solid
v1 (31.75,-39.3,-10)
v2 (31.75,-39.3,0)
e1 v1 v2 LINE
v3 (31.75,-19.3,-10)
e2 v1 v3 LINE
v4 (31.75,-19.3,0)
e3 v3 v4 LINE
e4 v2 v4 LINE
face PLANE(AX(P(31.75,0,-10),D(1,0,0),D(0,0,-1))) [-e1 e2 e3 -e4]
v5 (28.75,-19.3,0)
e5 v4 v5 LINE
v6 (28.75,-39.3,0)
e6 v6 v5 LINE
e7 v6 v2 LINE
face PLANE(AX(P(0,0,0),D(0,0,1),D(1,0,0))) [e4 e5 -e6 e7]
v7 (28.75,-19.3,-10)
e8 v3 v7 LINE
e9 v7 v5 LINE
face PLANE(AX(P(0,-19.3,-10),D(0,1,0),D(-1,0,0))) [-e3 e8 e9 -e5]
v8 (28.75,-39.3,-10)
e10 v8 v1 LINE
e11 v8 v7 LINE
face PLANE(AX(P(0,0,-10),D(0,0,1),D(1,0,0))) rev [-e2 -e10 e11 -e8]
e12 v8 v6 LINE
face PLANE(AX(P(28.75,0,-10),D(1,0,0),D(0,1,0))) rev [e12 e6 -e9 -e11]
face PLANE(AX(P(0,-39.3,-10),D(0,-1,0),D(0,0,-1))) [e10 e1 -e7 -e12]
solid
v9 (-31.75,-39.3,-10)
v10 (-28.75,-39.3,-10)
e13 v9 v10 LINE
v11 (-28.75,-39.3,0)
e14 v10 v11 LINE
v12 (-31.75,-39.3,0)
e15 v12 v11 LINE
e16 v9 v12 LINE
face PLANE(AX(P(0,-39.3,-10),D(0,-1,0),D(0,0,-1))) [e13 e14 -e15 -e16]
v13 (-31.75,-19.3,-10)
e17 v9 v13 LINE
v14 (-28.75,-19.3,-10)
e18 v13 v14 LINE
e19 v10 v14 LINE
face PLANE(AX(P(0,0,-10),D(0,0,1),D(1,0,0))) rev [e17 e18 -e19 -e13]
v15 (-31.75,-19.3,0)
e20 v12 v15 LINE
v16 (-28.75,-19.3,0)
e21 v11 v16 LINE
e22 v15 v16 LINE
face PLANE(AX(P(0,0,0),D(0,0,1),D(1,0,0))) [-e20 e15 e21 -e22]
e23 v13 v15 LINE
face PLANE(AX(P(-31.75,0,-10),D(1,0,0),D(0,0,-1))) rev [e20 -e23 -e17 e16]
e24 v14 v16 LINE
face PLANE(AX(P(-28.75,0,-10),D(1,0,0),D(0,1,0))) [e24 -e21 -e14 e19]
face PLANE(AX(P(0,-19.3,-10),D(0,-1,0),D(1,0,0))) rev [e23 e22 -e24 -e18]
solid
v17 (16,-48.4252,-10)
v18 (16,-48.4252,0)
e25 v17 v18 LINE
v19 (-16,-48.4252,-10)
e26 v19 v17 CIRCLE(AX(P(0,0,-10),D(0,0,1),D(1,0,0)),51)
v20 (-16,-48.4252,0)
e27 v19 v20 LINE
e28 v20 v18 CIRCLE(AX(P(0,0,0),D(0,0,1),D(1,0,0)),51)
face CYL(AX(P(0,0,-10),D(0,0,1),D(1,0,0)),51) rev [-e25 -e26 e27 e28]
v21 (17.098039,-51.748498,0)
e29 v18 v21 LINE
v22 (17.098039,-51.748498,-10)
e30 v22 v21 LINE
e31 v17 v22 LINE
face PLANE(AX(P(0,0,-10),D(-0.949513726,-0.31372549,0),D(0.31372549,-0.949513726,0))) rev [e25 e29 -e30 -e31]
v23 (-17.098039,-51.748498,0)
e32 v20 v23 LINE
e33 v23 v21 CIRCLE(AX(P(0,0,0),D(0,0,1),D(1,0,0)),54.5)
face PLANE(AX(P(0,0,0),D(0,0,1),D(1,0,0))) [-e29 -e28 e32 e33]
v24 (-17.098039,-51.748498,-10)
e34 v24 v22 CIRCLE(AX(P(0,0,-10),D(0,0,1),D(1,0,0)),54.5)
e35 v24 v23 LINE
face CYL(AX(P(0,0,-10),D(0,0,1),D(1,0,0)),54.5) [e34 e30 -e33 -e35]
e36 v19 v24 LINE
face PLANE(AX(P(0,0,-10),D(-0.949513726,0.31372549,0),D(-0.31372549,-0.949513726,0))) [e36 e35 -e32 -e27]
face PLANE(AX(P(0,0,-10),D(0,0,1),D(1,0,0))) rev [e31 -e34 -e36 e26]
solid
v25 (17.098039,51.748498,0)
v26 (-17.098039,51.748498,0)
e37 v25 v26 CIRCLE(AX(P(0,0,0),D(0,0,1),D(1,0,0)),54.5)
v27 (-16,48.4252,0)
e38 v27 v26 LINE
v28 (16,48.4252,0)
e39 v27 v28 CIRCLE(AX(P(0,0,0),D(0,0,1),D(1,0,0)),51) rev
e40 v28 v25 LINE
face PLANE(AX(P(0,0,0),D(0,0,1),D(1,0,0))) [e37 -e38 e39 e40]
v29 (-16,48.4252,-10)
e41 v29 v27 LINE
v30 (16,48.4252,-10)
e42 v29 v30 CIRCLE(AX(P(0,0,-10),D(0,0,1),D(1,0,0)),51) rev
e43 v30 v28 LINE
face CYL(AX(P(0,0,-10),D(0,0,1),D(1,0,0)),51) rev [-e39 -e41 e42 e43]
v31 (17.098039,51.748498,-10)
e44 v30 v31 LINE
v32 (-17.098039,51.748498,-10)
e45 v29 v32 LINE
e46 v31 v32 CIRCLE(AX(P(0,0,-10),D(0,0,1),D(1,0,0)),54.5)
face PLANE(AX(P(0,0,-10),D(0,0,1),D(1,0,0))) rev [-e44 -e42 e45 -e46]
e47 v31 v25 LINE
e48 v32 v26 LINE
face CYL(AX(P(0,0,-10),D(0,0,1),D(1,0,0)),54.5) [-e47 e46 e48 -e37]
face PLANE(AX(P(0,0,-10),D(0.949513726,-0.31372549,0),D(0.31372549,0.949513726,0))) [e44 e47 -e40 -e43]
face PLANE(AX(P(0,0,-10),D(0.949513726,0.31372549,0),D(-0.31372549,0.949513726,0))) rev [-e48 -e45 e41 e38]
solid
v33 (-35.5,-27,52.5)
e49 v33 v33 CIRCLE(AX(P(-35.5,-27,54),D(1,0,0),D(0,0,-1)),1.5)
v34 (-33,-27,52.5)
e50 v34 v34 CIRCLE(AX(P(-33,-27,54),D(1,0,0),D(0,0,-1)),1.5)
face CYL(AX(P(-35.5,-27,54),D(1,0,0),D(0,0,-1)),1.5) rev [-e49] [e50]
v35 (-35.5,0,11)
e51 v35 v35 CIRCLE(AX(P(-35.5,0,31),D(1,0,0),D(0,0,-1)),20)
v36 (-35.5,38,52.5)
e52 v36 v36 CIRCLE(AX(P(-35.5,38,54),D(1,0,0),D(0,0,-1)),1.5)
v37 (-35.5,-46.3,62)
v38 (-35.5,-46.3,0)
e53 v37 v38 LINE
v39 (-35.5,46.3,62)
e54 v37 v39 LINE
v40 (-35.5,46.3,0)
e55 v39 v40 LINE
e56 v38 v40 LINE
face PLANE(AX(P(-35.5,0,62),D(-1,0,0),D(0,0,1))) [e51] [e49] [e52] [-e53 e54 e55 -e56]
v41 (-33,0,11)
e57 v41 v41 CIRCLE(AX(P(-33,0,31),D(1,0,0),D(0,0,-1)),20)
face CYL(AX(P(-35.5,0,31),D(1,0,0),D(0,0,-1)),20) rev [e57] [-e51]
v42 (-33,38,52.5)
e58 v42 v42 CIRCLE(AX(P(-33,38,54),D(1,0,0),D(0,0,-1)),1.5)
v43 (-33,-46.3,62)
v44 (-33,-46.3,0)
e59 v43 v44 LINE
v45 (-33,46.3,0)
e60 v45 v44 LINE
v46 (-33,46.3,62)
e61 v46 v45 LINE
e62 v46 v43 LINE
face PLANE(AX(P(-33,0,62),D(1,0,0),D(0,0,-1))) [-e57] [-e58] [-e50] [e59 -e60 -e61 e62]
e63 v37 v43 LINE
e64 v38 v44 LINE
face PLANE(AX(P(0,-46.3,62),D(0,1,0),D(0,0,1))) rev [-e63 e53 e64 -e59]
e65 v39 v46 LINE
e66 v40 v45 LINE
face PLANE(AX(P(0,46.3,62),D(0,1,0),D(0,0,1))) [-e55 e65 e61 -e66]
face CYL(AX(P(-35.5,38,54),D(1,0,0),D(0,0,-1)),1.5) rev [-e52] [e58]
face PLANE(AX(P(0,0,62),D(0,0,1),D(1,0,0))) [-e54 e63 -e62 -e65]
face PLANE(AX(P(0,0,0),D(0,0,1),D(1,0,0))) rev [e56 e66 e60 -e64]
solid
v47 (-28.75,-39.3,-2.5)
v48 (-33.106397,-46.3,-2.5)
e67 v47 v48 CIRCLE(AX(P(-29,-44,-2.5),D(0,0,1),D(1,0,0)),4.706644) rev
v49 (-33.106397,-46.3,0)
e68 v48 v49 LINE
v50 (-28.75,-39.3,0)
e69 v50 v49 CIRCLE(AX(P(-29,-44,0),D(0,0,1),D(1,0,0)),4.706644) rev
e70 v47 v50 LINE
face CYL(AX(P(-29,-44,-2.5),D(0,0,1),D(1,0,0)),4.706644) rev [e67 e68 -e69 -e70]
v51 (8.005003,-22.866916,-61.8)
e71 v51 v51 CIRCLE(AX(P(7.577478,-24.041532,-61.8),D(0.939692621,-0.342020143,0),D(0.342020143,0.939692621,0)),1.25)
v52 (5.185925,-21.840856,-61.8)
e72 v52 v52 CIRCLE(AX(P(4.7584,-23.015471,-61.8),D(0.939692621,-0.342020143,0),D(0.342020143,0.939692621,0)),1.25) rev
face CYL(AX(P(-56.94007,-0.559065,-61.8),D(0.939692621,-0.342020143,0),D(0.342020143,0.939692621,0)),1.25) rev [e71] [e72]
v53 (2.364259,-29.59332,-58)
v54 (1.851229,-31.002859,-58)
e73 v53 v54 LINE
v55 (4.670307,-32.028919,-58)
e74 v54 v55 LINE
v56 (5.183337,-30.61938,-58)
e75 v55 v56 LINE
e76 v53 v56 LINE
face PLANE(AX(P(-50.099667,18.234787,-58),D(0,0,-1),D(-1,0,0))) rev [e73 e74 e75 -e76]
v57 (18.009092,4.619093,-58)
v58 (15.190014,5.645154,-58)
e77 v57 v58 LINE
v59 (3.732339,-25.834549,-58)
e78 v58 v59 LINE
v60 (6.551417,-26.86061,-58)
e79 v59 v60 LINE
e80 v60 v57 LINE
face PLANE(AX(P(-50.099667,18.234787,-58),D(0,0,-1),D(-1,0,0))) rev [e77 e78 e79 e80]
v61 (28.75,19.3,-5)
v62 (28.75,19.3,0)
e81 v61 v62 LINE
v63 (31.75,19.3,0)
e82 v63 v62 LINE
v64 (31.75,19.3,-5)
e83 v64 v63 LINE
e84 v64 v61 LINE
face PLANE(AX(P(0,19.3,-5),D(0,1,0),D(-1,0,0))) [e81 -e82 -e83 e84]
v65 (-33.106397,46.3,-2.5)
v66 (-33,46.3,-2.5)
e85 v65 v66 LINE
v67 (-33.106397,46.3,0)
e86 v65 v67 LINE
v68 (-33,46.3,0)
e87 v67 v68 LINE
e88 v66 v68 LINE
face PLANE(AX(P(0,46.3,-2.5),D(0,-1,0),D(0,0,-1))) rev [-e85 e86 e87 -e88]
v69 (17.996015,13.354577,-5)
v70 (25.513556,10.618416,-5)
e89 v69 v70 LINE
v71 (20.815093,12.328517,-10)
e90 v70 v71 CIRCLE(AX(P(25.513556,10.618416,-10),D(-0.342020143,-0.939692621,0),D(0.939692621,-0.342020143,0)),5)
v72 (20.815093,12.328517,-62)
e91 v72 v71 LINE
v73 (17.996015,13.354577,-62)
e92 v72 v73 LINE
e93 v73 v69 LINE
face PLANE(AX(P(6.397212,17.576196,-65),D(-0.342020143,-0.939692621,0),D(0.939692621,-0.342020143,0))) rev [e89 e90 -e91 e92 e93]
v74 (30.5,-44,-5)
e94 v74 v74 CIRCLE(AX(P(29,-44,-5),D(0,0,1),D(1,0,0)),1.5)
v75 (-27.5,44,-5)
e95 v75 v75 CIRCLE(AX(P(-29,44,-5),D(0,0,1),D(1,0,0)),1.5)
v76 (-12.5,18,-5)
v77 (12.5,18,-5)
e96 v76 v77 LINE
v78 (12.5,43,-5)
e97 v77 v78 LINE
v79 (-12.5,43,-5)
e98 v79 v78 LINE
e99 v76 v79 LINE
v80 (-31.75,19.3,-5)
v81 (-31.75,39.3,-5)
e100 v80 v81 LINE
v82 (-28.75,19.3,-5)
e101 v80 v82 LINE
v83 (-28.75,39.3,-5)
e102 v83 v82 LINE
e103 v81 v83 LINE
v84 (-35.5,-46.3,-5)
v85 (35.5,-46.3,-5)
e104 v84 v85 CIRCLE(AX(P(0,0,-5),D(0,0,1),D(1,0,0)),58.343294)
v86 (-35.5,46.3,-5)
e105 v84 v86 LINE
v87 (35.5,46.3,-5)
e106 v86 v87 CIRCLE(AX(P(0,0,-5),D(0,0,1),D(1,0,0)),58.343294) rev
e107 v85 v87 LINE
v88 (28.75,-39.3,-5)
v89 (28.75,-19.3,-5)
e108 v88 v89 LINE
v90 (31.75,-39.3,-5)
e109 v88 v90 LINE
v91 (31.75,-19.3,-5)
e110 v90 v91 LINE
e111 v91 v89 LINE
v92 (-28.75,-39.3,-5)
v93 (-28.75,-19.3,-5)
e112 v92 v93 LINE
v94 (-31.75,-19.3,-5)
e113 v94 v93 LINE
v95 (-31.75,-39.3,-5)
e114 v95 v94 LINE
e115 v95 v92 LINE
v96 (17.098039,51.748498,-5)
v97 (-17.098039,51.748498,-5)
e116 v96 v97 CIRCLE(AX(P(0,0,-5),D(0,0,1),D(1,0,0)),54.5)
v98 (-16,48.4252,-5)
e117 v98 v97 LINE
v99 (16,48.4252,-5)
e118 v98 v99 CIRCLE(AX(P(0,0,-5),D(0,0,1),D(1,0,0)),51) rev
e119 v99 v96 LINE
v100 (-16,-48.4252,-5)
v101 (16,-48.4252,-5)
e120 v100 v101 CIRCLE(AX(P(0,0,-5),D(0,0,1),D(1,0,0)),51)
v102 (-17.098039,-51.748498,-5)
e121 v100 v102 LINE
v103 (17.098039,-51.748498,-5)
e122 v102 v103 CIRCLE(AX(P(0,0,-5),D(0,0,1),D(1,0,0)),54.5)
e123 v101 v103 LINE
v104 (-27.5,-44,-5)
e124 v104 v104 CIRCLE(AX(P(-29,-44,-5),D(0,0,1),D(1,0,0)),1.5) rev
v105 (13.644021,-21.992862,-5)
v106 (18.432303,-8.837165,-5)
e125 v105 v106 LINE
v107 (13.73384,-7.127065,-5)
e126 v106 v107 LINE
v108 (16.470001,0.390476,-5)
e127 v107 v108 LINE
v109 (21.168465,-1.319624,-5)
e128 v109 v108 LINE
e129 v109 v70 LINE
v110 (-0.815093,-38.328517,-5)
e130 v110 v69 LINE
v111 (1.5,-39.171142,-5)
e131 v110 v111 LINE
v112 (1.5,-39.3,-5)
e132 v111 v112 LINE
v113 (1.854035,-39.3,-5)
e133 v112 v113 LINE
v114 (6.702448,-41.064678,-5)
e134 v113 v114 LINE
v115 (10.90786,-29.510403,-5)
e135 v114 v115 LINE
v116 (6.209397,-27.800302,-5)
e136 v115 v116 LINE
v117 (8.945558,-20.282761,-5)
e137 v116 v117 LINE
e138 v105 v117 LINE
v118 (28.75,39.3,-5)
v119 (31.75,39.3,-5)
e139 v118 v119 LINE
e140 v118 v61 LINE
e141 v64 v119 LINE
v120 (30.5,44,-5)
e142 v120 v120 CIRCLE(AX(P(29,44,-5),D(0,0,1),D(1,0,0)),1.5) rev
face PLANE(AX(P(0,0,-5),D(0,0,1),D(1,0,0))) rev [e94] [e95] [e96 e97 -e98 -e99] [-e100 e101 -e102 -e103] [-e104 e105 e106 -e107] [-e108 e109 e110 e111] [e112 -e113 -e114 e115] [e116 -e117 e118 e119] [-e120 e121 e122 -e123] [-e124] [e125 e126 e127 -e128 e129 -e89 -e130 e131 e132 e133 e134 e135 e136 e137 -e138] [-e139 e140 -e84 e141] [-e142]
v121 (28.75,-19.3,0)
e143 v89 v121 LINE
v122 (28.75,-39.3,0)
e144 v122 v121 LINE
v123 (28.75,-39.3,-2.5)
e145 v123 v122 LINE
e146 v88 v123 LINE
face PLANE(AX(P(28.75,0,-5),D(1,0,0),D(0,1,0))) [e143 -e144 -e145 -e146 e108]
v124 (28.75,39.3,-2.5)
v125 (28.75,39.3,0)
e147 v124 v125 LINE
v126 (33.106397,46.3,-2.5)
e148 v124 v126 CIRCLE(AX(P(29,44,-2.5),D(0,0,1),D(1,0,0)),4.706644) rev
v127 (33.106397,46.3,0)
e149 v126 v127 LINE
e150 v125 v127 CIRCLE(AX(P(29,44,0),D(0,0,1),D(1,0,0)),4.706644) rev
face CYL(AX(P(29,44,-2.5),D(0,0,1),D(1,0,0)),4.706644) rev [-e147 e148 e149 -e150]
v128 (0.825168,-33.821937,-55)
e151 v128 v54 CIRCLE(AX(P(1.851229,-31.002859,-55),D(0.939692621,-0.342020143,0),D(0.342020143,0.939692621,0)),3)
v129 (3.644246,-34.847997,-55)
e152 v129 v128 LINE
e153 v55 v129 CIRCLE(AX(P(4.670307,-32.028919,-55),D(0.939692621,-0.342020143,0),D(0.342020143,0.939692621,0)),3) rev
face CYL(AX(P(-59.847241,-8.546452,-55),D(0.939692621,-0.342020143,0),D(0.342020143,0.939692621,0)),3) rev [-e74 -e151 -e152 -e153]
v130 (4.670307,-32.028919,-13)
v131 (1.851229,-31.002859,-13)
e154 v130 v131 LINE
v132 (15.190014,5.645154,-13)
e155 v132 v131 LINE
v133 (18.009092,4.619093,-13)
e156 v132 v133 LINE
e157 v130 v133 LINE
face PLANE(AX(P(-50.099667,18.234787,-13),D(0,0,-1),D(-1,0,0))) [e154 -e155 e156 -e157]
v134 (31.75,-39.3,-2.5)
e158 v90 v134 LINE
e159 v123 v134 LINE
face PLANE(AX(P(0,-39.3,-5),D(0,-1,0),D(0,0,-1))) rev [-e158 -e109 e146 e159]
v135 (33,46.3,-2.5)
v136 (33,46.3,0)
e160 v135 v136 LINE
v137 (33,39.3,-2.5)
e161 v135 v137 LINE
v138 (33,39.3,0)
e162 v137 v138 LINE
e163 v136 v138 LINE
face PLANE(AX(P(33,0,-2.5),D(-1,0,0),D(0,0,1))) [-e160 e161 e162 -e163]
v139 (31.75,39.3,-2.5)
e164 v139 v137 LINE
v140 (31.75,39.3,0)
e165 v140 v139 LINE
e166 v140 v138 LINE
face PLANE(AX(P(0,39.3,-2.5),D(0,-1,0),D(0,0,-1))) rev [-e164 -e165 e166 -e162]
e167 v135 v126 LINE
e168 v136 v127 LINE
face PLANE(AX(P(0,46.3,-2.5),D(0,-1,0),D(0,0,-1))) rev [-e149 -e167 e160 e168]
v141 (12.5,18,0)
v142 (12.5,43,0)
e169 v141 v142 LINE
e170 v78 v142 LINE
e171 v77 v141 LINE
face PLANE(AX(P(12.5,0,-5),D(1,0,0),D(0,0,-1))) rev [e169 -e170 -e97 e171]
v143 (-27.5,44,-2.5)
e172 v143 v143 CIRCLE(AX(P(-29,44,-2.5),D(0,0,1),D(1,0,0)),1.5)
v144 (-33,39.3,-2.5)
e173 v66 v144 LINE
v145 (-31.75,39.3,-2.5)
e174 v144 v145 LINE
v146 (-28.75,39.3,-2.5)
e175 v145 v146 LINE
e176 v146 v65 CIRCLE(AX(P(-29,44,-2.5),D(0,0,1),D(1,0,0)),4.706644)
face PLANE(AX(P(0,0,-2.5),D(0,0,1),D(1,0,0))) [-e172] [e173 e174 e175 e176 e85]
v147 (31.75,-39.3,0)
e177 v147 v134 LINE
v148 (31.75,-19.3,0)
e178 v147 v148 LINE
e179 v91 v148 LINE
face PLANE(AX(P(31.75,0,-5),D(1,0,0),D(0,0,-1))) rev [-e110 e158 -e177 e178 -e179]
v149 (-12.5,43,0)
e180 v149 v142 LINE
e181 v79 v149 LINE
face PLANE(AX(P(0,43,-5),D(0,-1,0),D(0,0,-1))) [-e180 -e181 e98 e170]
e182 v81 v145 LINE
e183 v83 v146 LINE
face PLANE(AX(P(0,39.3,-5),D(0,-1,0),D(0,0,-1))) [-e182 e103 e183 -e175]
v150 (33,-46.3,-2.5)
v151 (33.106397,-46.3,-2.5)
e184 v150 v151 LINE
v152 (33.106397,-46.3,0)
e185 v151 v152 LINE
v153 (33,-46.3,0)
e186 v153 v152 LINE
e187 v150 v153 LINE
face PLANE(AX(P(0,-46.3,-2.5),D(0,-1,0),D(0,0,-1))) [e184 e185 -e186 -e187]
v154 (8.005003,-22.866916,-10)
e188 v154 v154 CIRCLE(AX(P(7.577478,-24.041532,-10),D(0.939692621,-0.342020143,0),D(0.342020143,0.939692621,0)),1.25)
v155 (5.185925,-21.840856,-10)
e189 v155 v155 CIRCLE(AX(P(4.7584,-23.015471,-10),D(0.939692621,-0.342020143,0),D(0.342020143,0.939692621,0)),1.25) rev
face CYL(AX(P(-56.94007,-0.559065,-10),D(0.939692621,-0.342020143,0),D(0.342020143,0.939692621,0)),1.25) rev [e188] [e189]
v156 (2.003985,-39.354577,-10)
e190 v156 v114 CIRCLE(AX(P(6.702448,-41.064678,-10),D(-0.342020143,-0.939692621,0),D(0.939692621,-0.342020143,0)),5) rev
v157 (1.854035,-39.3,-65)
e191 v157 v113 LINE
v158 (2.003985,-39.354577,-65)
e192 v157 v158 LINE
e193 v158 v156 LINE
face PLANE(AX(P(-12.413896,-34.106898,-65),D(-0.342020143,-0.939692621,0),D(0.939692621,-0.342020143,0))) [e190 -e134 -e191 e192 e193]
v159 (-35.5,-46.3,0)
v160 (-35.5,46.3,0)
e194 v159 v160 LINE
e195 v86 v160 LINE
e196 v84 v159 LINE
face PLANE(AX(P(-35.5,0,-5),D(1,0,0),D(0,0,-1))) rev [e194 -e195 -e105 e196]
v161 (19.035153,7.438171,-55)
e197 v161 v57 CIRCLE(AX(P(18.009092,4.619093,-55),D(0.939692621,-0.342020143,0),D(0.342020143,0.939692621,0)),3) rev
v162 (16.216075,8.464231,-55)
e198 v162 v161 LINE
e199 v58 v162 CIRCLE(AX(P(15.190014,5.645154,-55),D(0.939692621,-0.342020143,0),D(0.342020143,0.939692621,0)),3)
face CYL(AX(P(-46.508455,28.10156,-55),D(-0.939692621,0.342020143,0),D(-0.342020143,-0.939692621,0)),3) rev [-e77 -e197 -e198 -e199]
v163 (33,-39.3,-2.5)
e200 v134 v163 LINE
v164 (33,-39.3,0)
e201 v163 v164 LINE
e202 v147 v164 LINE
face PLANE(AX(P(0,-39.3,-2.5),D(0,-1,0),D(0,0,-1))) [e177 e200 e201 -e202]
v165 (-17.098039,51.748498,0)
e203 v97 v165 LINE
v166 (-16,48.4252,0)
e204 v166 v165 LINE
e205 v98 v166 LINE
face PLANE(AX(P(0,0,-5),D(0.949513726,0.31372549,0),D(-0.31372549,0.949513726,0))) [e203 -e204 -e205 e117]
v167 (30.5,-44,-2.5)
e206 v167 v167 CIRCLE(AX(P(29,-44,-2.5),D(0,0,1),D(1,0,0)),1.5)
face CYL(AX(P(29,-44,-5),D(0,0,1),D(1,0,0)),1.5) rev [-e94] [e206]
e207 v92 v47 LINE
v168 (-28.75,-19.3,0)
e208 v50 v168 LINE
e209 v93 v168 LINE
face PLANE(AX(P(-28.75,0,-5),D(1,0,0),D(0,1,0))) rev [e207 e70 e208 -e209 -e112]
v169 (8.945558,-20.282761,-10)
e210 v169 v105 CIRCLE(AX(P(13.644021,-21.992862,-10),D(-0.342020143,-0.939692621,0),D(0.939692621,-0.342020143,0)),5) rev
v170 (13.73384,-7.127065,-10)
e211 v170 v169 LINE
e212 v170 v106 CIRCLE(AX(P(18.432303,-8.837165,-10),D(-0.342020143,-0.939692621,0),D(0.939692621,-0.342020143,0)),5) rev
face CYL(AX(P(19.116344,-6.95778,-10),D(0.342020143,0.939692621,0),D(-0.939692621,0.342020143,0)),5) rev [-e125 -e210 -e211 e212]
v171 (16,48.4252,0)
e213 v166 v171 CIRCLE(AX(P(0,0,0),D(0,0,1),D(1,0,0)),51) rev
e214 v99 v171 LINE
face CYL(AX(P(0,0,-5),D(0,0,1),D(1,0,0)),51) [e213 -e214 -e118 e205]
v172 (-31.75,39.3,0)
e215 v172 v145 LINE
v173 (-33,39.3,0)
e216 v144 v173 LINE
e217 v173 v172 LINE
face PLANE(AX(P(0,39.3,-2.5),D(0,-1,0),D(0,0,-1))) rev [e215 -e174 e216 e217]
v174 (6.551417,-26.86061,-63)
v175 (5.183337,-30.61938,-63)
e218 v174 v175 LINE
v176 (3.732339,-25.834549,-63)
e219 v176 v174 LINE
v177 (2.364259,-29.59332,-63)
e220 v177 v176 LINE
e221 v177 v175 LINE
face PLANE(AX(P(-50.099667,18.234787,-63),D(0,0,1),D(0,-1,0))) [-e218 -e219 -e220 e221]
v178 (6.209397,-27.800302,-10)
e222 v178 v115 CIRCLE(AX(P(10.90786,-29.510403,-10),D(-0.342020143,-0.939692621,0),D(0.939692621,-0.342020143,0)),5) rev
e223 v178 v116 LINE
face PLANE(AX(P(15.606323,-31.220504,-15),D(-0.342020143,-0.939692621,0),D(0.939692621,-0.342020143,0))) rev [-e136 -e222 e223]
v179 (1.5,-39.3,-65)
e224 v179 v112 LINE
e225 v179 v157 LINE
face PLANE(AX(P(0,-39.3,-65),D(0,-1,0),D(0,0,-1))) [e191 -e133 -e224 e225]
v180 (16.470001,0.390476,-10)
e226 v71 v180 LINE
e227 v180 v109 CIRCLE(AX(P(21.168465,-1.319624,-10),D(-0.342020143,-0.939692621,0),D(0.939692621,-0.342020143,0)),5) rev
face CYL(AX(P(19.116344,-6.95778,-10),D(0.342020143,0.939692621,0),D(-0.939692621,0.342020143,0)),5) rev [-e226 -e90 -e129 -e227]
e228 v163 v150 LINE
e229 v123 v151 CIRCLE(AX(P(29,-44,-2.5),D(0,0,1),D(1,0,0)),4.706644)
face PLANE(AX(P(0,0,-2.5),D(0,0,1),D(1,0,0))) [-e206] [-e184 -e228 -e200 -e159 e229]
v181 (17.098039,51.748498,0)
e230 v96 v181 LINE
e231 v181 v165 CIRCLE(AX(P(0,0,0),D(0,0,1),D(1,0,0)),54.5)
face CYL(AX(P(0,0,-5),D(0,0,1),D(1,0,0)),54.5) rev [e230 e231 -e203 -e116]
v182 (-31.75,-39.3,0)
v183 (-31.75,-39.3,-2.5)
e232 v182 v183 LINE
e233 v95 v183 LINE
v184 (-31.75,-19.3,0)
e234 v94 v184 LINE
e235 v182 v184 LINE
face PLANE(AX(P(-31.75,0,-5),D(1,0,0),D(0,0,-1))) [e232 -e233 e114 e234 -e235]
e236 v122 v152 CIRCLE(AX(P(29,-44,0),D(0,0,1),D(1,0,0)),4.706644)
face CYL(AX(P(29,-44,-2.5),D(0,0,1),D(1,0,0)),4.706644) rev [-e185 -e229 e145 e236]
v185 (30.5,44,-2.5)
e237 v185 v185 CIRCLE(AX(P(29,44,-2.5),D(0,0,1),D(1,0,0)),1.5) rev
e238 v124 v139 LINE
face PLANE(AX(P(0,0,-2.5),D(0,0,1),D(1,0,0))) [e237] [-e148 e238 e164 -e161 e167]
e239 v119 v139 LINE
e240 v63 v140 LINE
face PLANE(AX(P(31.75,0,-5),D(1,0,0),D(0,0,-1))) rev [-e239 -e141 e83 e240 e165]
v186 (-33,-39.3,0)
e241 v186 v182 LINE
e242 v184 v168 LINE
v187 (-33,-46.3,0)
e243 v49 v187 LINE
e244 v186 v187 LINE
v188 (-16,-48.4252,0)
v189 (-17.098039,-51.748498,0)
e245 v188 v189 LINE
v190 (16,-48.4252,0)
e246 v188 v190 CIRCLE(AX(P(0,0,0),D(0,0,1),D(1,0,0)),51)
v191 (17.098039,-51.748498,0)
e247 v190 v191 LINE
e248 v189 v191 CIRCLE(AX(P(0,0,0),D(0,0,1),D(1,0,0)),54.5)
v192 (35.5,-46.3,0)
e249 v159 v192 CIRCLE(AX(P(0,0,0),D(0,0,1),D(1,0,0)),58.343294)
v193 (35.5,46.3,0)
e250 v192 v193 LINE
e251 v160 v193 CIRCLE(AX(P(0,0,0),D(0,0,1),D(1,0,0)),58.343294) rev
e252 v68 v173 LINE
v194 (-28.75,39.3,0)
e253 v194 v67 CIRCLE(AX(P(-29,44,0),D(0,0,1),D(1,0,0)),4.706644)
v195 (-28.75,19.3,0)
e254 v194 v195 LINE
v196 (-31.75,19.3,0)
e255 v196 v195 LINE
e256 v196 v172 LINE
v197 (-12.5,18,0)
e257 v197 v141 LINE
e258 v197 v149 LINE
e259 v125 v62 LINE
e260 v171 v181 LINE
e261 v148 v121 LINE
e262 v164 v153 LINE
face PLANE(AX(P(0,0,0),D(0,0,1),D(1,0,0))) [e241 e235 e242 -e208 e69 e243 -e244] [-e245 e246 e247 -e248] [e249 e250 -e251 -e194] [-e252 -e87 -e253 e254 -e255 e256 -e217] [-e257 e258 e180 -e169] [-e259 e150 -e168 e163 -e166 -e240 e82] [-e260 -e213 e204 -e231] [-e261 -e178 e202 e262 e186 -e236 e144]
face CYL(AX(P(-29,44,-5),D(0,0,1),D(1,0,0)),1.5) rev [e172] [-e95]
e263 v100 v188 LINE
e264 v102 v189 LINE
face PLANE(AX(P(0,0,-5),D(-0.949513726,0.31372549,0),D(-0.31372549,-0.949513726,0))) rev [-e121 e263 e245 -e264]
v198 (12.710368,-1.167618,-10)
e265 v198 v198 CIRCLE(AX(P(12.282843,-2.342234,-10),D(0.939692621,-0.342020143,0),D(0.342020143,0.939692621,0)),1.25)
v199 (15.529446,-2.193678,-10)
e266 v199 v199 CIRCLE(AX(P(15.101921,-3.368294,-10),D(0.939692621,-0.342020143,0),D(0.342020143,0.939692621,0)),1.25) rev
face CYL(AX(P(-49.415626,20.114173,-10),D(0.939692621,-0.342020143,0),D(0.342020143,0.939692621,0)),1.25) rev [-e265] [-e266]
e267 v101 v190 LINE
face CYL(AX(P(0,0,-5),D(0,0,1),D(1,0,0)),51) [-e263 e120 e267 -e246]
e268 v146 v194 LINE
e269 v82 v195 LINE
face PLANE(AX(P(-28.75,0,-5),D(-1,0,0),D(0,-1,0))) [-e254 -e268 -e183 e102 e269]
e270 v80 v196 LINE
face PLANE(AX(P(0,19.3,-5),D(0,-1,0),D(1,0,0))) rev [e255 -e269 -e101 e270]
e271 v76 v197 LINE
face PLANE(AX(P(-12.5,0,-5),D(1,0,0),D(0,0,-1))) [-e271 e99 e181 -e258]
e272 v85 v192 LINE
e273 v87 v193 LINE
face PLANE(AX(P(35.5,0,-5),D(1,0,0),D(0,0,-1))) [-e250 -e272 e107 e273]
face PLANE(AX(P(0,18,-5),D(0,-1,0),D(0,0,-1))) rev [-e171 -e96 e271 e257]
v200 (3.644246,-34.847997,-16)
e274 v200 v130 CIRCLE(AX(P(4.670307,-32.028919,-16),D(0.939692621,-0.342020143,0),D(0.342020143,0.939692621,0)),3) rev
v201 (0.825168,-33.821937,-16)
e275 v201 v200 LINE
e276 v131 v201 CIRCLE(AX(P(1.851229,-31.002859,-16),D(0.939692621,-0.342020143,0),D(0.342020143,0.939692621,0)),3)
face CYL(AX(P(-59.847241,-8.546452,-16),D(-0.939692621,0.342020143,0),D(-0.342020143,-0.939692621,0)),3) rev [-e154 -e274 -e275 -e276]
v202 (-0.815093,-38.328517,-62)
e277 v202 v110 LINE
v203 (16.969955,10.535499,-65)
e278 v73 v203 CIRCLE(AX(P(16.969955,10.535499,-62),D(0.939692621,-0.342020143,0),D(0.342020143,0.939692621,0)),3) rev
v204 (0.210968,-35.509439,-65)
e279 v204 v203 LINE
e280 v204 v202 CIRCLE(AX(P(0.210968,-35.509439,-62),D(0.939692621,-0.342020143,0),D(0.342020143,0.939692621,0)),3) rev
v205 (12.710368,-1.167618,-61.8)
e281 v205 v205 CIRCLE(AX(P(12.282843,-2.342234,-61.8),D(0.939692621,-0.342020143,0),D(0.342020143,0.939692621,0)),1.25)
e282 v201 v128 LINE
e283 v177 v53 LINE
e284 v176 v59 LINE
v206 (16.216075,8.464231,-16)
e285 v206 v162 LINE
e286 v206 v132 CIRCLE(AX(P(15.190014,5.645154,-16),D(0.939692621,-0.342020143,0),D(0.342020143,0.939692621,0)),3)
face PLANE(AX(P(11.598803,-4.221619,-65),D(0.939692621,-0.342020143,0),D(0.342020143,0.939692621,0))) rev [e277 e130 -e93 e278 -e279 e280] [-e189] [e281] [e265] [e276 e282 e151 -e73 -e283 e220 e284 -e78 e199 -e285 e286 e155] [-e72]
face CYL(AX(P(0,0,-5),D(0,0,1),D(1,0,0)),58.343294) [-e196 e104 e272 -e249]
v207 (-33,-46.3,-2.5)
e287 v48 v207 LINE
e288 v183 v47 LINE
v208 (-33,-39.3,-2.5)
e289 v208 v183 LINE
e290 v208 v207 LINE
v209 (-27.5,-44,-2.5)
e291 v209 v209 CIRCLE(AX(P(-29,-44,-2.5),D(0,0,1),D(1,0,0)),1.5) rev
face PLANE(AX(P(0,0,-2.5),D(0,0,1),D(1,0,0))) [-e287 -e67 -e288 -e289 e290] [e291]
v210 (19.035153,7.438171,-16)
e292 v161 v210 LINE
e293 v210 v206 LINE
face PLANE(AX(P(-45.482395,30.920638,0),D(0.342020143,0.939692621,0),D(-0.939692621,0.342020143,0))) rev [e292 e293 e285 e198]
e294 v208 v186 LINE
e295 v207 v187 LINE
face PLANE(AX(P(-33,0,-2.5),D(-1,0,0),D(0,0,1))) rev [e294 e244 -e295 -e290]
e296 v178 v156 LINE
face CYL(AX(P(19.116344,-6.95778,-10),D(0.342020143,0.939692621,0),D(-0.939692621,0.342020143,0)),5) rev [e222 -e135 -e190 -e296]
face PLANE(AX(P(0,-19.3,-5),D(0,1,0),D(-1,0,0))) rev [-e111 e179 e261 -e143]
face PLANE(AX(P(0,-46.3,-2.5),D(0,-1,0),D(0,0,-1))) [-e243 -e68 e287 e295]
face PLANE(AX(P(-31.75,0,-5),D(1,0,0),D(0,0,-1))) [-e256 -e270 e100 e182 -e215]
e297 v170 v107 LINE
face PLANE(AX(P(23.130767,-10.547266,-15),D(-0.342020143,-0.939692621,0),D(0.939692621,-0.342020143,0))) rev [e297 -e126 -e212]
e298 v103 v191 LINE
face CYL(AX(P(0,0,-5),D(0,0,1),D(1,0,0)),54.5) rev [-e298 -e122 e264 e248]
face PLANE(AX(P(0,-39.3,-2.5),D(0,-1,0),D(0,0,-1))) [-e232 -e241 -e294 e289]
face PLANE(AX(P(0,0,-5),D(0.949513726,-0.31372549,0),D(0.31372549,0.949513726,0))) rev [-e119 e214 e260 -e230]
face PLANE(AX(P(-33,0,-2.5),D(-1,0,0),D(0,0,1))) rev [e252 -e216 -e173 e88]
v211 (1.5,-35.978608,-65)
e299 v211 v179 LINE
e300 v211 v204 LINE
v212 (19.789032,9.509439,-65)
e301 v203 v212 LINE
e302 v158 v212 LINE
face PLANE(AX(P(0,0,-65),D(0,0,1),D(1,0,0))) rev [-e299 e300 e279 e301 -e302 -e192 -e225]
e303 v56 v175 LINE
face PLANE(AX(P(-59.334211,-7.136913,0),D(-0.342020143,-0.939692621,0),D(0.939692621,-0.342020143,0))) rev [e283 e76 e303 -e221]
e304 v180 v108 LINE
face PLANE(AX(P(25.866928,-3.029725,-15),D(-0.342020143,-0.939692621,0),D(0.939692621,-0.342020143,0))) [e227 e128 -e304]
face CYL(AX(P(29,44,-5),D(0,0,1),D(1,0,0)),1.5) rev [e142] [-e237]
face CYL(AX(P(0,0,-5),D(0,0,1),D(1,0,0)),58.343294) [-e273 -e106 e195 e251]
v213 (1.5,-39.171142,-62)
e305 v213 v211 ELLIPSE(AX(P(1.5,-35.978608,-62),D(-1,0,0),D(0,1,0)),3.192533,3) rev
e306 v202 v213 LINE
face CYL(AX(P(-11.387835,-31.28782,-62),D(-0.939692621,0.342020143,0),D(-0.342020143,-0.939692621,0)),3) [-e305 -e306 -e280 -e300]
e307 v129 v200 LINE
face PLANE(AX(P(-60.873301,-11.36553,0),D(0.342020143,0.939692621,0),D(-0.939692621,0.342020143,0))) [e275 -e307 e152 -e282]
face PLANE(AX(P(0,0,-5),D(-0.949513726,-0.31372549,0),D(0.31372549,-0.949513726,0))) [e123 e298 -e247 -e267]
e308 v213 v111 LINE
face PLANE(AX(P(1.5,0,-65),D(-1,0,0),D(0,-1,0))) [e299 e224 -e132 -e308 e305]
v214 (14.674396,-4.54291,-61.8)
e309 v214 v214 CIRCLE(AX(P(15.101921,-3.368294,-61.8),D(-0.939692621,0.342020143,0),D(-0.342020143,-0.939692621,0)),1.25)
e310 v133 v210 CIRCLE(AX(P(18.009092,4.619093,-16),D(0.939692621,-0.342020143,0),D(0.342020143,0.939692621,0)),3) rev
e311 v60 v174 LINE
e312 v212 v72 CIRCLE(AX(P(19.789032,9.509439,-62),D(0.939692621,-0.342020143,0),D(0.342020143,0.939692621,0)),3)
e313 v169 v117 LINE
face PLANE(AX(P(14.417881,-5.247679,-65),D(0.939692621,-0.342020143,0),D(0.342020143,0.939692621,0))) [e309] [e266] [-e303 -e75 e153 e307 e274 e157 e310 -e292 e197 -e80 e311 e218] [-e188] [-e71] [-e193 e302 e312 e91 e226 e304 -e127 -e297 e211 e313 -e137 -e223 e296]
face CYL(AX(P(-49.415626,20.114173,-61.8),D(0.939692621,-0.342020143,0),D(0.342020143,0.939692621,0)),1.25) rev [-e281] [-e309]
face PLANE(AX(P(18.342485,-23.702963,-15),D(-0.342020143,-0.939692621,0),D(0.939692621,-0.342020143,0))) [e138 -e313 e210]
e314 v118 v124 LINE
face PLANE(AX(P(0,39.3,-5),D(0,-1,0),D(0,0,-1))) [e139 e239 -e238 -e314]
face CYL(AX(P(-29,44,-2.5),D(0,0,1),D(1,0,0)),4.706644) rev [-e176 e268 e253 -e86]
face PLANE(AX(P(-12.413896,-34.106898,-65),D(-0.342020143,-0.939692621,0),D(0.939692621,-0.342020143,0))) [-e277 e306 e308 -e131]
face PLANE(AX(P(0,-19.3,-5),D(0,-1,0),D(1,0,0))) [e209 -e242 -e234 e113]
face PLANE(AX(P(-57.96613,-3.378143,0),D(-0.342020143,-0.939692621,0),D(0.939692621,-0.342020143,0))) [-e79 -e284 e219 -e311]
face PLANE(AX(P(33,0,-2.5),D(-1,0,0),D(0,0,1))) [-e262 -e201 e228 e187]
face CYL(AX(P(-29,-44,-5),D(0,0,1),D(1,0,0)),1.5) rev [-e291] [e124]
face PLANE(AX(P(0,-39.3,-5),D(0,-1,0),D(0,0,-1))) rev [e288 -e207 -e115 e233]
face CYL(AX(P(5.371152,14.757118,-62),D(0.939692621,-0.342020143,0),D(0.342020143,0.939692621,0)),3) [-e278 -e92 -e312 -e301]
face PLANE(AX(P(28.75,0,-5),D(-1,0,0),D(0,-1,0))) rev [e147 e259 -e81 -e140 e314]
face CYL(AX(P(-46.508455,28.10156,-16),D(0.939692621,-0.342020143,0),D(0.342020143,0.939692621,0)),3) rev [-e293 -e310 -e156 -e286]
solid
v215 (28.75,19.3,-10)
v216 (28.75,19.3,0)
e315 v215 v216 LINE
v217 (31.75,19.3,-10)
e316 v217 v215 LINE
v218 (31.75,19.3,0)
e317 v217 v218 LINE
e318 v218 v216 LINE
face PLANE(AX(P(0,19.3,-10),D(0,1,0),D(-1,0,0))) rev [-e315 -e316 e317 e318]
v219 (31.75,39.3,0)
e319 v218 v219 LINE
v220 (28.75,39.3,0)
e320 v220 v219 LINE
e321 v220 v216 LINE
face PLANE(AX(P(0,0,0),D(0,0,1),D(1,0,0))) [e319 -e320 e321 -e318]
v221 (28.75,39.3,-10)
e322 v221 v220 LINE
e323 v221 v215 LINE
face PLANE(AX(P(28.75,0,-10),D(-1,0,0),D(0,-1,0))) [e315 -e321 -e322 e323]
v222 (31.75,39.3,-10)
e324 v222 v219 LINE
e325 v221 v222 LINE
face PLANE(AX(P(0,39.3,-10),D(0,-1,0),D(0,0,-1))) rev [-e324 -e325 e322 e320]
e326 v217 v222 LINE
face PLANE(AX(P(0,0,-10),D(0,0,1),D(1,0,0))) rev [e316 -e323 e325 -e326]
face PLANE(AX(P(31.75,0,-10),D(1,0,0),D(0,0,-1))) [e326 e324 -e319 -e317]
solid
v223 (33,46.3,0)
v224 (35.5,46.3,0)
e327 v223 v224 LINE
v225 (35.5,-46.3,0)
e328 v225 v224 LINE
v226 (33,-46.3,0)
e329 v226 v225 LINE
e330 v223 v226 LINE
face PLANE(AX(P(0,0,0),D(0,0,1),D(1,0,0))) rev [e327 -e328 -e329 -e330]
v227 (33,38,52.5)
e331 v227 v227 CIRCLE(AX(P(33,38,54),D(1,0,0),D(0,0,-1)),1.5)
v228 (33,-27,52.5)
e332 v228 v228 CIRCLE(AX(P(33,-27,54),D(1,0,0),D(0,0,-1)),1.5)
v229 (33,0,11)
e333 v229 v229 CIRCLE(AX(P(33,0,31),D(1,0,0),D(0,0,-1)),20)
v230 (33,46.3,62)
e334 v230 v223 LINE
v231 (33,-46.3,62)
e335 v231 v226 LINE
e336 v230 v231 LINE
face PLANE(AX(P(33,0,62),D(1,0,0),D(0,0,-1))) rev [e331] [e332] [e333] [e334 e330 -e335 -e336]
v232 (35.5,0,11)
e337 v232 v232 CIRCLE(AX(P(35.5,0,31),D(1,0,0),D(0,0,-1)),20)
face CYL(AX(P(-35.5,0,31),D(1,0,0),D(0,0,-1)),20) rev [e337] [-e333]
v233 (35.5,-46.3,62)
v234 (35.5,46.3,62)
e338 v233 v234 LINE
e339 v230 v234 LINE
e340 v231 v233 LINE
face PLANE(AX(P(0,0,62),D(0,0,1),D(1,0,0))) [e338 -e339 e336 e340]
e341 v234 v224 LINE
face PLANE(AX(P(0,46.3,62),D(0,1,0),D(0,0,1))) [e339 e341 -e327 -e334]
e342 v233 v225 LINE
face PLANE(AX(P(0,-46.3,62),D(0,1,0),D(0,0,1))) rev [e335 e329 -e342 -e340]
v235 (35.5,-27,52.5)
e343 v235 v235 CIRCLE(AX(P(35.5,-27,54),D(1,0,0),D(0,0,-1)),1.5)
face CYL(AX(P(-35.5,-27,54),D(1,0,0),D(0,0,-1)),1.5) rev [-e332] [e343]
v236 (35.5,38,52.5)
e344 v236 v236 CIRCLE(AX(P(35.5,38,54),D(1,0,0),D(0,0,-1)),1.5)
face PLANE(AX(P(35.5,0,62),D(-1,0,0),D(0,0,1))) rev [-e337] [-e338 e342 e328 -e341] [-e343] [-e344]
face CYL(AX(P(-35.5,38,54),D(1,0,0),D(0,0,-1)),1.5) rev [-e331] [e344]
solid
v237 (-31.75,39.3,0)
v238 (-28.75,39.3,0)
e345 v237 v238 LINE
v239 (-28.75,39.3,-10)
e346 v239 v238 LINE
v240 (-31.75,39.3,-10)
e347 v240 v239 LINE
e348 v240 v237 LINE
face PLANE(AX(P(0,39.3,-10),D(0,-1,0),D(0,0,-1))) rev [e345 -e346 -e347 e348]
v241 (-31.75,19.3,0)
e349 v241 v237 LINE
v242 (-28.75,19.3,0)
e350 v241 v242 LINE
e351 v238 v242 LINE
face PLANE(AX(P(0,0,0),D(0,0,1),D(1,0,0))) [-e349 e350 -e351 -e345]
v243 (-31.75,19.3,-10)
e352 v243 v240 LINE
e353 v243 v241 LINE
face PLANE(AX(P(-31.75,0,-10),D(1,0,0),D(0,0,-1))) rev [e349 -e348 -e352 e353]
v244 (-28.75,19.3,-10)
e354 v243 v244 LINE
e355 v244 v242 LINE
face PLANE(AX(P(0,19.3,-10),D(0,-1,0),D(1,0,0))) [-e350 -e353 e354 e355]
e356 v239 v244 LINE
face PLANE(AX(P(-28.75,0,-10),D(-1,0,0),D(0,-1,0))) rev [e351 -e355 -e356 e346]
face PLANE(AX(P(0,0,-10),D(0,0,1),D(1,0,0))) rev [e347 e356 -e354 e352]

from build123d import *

# Parameters (mm, degrees)
SKETCH_3_6_R             = 1.5
SKETCH_3_6_W             = 3
SKETCH_3_6_H             = 20
SKETCH_3_6_W_2           = 25
SKETCH_3_6_H_2           = 25
EXTRUDE_4_DEPTH          = 5
EXTRUDE_START            = -65
EXTRUDE_7_DEPTH          = 65
EXTRUDE_6_DEPTH          = 62
EXTRUDE_6_2_DEPTH        = 62
SKETCH_4_R               = 1.25
CUT_EXTRUDE_2_DEPTH      = 3
CUT_EXTRUDE_3_DEPTH      = 95.282501027
CUT_EXTRUDE_3_DEPTH_BACK = 95.282501027
SKETCH_7_R               = 20
SKETCH_7_R_2             = 1.5
SKETCH_3_R               = 1.5
CUT_EXTRUDE_4_DEPTH      = 2.5
SKETCH_3_12_W            = 3
SKETCH_3_12_H            = 20
EXTRUDE_8_DEPTH          = 10
EXTRUDE_8_2_DEPTH        = 10
EXTRUDE_8_3_DEPTH        = 10
EXTRUDE_8_4_DEPTH        = 10
EXTRUDE_8_5_DEPTH        = 10
EXTRUDE_8_6_DEPTH        = 10
FILLET_1_R               = 3
FILLET_5_R               = 5
SKETCH_4_4_W             = 10
SKETCH_4_4_H             = 8
CUT_EXTRUDE_5_DEPTH      = 10


# Read off the part's stored shape, not the designer's step: 凸台-拉伸7
with BuildPart() as part:
    # 草图3<6> → 凸台-拉伸4 (new body)
    with BuildSketch(Plane.XY):
        with BuildLine():
            Line((-35.5, 46.3), (-35.5, -46.3))
            ThreePointArc((-35.5, -46.3), (0, -58.343294388), (35.5, -46.3))
            Line((35.5, -46.3), (35.5, 46.3))
            ThreePointArc((35.5, 46.3), (0, 58.343294388), (-35.5, 46.3))
        make_face()
        with Locations((-29, -44)):
            Circle(SKETCH_3_6_R, mode=Mode.SUBTRACT)
        with Locations((-30.25, -29.3)):
            Rectangle(SKETCH_3_6_W, SKETCH_3_6_H, mode=Mode.SUBTRACT)
        with BuildLine():
            ThreePointArc((17.098039216, -51.748498094), (0, -54.5), (-17.098039216, -51.748498094))
            Line((-17.098039216, -51.748498094), (-16, -48.425200051))
            ThreePointArc((-16, -48.425200051), (0, -51), (16, -48.425200051))
            Line((16, -48.425200051), (17.098039216, -51.748498094))
        make_face(mode=Mode.SUBTRACT)
        with Locations((29, -44)):
            Circle(SKETCH_3_6_R, mode=Mode.SUBTRACT)
        with Locations((30.25, -29.3)):
            Rectangle(SKETCH_3_6_W, SKETCH_3_6_H, mode=Mode.SUBTRACT)
        Polygon((1.854035127, -39.3), (1.5, -39.3), (1.5, -31.967851465), (17.99601501, 13.354577287), (20.815092873, 12.328516857), (2.00398499, -39.354577287), align=None, mode=Mode.SUBTRACT)
        with Locations((-30.25, 29.3)):
            Rectangle(SKETCH_3_6_W, SKETCH_3_6_H, mode=Mode.SUBTRACT)
        with Locations((-29, 44)):
            Circle(SKETCH_3_6_R, mode=Mode.SUBTRACT)
        with Locations((0, 30.5)):
            Rectangle(SKETCH_3_6_W_2, SKETCH_3_6_H_2, mode=Mode.SUBTRACT)
        with BuildLine():
            ThreePointArc((-17.098039216, 51.748498094), (0, 54.5), (17.098039216, 51.748498094))
            Line((17.098039216, 51.748498094), (16, 48.425200051))
            ThreePointArc((16, 48.425200051), (0, 51), (-16, 48.425200051))
            Line((-16, 48.425200051), (-17.098039216, 51.748498094))
        make_face(mode=Mode.SUBTRACT)
        with Locations((30.25, 29.3)):
            Rectangle(SKETCH_3_6_W, SKETCH_3_6_H, mode=Mode.SUBTRACT)
        with Locations((29, 44)):
            Circle(SKETCH_3_6_R, mode=Mode.SUBTRACT)
    extrude(amount=-EXTRUDE_4_DEPTH)

    # 凸台-拉伸7 outline → 凸台-拉伸7 (add)
    with BuildSketch(Plane.XY.offset(EXTRUDE_START)):
        Polygon((-0.815092873, -38.328516857), (1.5, -39.171141752), (1.5, -39.3), (1.854035127, -39.3), (2.00398499, -39.354577287), (20.815092873, 12.328516857), (17.99601501, 13.354577287), align=None)
    extrude(amount=EXTRUDE_7_DEPTH)

    # 草图4 → 切除-拉伸2 (cut)
    with BuildSketch(Plane(origin=(14.41788061, -5.247679383, 0), x_dir=(0, 0, -1), z_dir=(0.9396926207859095, -0.34202014332566566, 0))):
        Polygon((63, -23), (58, -23), (58, 13.5), (13, 13.5), (13, -31.5), (58, -31.5), (58, -27), (63, -27), align=None)
        with Locations(Location((10, -20, 0), (0, 0, 90))):
            Circle(SKETCH_4_R)
        with Locations(Location((10, 2, 0), (0, 0, 90))):
            Circle(SKETCH_4_R)
        with Locations(Location((61.8, -20, 0), (0, 0, 90))):
            Circle(SKETCH_4_R)
        with Locations(Location((61.8, 2, 0), (0, 0, 90))):
            Circle(SKETCH_4_R)
    extrude(amount=-CUT_EXTRUDE_2_DEPTH, mode=Mode.SUBTRACT)

    # 草图3 → 切除-拉伸4 (cut)
    # profile 1 of 8: a face of its own
    with BuildSketch(Plane.XY):
        with BuildLine():
            Line((-24.893602552, 46.3), (-33, 46.3))
            Line((-33, 46.3), (-33, 39.3))
            Line((-33, 39.3), (-31.75, 39.3))
            Line((-31.75, 39.3), (-28.75, 39.3))
            ThreePointArc((-28.75, 39.3), (-24.877555376, 41.728887867), (-24.893602552, 46.3))
        make_face()
        with Locations((-29, 44)):
            Circle(SKETCH_3_R, mode=Mode.SUBTRACT)
    # profile 2 of 8: a face of its own
    with BuildSketch(Plane.XY):
        with BuildLine():
            ThreePointArc((-26.20469003, 47.786653162), (-29.991096362, 48.601111605), (-33.106397448, 46.3))
            Line((-33.106397448, 46.3), (-33, 46.3))
            Line((-33, 46.3), (-24.893602552, 46.3))
            ThreePointArc((-24.893602552, 46.3), (-25.469996356, 47.113129338), (-26.20469003, 47.786653162))
        make_face()
    # profile 3 of 8: a face of its own
    with BuildSketch(Plane.XY):
        with BuildLine():
            Line((33, 39.3), (33, 46.3))
            Line((33, 46.3), (24.893602552, 46.3))
            ThreePointArc((24.893602552, 46.3), (24.877555376, 41.728887867), (28.75, 39.3))
            Line((28.75, 39.3), (31.75, 39.3))
            Line((31.75, 39.3), (33, 39.3))
        make_face()
        with Locations((29, 44)):
            Circle(SKETCH_3_R, mode=Mode.SUBTRACT)
    # profile 4 of 8: a face of its own
    with BuildSketch(Plane.XY):
        with BuildLine():
            Line((33, 46.3), (33.106397448, 46.3))
            ThreePointArc((33.106397448, 46.3), (29.991096362, 48.601111605), (26.20469003, 47.786653162))
            ThreePointArc((26.20469003, 47.786653162), (25.469996356, 47.113129338), (24.893602552, 46.3))
            Line((24.893602552, 46.3), (33, 46.3))
        make_face()
    # profile 5 of 8: a face of its own
    with BuildSketch(Plane.XY):
        with BuildLine():
            Line((24.893602552, -46.3), (33, -46.3))
            Line((33, -46.3), (33, -39.3))
            Line((33, -39.3), (31.75, -39.3))
            Line((31.75, -39.3), (28.75, -39.3))
            ThreePointArc((28.75, -39.3), (24.877555376, -41.728887867), (24.893602552, -46.3))
        make_face()
        with Locations((29, -44)):
            Circle(SKETCH_3_R, mode=Mode.SUBTRACT)
    # profile 6 of 8: a face of its own
    with BuildSketch(Plane.XY):
        with BuildLine():
            ThreePointArc((26.20469003, -47.786653162), (29.991096362, -48.601111605), (33.106397448, -46.3))
            Line((33.106397448, -46.3), (33, -46.3))
            Line((33, -46.3), (24.893602552, -46.3))
            ThreePointArc((24.893602552, -46.3), (25.469996356, -47.113129338), (26.20469003, -47.786653162))
        make_face()
    # profile 7 of 8: a face of its own
    with BuildSketch(Plane.XY):
        with BuildLine():
            Line((-33, -39.3), (-33, -46.3))
            Line((-33, -46.3), (-24.893602552, -46.3))
            ThreePointArc((-24.893602552, -46.3), (-24.877555376, -41.728887867), (-28.75, -39.3))
            Line((-28.75, -39.3), (-31.75, -39.3))
            Line((-31.75, -39.3), (-33, -39.3))
        make_face()
        with Locations((-29, -44)):
            Circle(SKETCH_3_R, mode=Mode.SUBTRACT)
    # profile 8 of 8: a face of its own
    with BuildSketch(Plane.XY):
        with BuildLine():
            Line((-33, -46.3), (-33.106397448, -46.3))
            ThreePointArc((-33.106397448, -46.3), (-29.991096362, -48.601111605), (-26.20469003, -47.786653162))
            ThreePointArc((-26.20469003, -47.786653162), (-25.469996356, -47.113129338), (-24.893602552, -46.3))
            Line((-24.893602552, -46.3), (-33, -46.3))
        make_face()
    extrude(amount=-CUT_EXTRUDE_4_DEPTH, mode=Mode.SUBTRACT)

    # 圆角1
    fillet_1_edges = [part.edges().sort_by_distance(p)[0] for p in [
        (0.342453564, -38.749829304, -65),
        (19.405553942, 12.841547072, -65),
        (17.625613613, 7.951201212, -13),
        (17.625613613, 7.951201212, -58),
        (2.234707164, -34.334966723, -58),
        (2.234707164, -34.334966723, -13),
    ]]
    fillet(fillet_1_edges, radius=FILLET_1_R)

    # 圆角5
    # the kernel refuses this fillet: 5 mm, written as the material it adds along each edge
    with BuildSketch(Plane(origin=(20.815092873, 12.328516857, -5), x_dir=(4.0352212111646156e-11, -1.4687004095435187e-11, -1.0), z_dir=(-0.3420201433256656, -0.9396926207859095, 0))) as fillet_5_piece_1_section:
        with BuildLine():
            CenterArc((FILLET_5_R, FILLET_5_R), FILLET_5_R, 179.999999998, 90)
            Line((FILLET_5_R * 4.29419272013e-11, FILLET_5_R), (0, 0))
            Line((0, 0), (FILLET_5_R, 0))
        make_face()
    fillet_5_piece_1 = extrude(amount=55, mode=Mode.PRIVATE)
    fillet_5_piece_1 = fillet_5_piece_1 - Plane(origin=(8.643311737, -24.429463647, -10), x_dir=(0.34202014332566566, 0.9396926207859095, 0), z_dir=(0.9396926207859095, -0.34202014332566566, 0)) * Cylinder(1.25, 131, mode=Mode.PRIVATE)
    fillet_5_piece_1 = fillet_5_piece_1 - Plane(origin=(16.16775489, -3.75622599, -10), x_dir=(0.34202014332566566, 0.9396926207859095, 0), z_dir=(0.9396926207859095, -0.34202014332566566, 0)) * Cylinder(1.25, 131, mode=Mode.PRIVATE)
    add(fillet_5_piece_1)

    # 草图4<4> → 切除-拉伸5 (cut)
    with BuildSketch(Plane(origin=(14.41788061, -5.247679383, 0), x_dir=(0, 0, -1), z_dir=(0.9396926207859095, -0.34202014332566566, 0))):
        with Locations((10, -20)):
            Rectangle(SKETCH_4_4_W, SKETCH_4_4_H)
        with Locations((10, 2)):
            Rectangle(SKETCH_4_4_W, SKETCH_4_4_H)
    extrude(amount=CUT_EXTRUDE_5_DEPTH, mode=Mode.SUBTRACT)


with BuildPart() as body_2:
    # 草图3<8> → 凸台-拉伸6 (new body)
    with BuildSketch(Plane.XY):
        Polygon((-35.5, 46.3), (-35.5, -46.3), (-33.106397448, -46.3), (-33, -46.3), (-33, -39.3), (-33, 39.3), (-33, 46.3), (-33.106397448, 46.3), align=None)
    extrude(amount=EXTRUDE_6_DEPTH)


with BuildPart() as body_3:
    # 草图3<8> → Extrude 6 2 (new body)
    with BuildSketch(Plane.XY):
        Polygon((33.106397448, -46.3), (35.5, -46.3), (35.5, 46.3), (33.106397448, 46.3), (33, 46.3), (33, 39.3), (33, -39.3), (33, -46.3), align=None)
    extrude(amount=EXTRUDE_6_2_DEPTH)


with BuildPart() as cut_extrude_3_tool:
    # 草图7 → 切除-拉伸3 (new, two sides: drawn at the far end of the back side and taken through both)
    with BuildSketch(Plane(origin=(0, 0, 0), x_dir=(0, 0, -1), z_dir=(1, 0, 0)).offset(-CUT_EXTRUDE_3_DEPTH_BACK)):
        with Locations((-31, 0)):
            Circle(SKETCH_7_R)
        with Locations((-54, 38)):
            Circle(SKETCH_7_R_2)
        with Locations((-54, -27)):
            Circle(SKETCH_7_R_2)
    extrude(amount=CUT_EXTRUDE_3_DEPTH + CUT_EXTRUDE_3_DEPTH_BACK)


with BuildPart() as body_2_1:
    add(body_2.part)

    # 切除-拉伸3: cut by cut_extrude_3_tool
    add(cut_extrude_3_tool.part, mode=Mode.SUBTRACT)


with BuildPart() as body_3_1:
    add(body_3.part)

    # 切除-拉伸3: cut by cut_extrude_3_tool
    add(cut_extrude_3_tool.part, mode=Mode.SUBTRACT)


with BuildPart() as body_4:
    # 草图3<12> → 凸台-拉伸8 (new body)
    with BuildSketch(Plane.XY):
        with Locations((-30.25, 29.3)):
            Rectangle(SKETCH_3_12_W, SKETCH_3_12_H)
    extrude(amount=-EXTRUDE_8_DEPTH)


with BuildPart() as body_5:
    # 草图3<12> → Extrude 8 2 (new body)
    with BuildSketch(Plane.XY):
        with BuildLine():
            ThreePointArc((17.098039216, 51.748498094), (0, 54.5), (-17.098039216, 51.748498094))
            Line((-17.098039216, 51.748498094), (-16, 48.425200051))
            ThreePointArc((-16, 48.425200051), (0, 51), (16, 48.425200051))
            Line((16, 48.425200051), (17.098039216, 51.748498094))
        make_face()
    extrude(amount=-EXTRUDE_8_2_DEPTH)


with BuildPart() as body_6:
    # 草图3<12> → Extrude 8 3 (new body)
    with BuildSketch(Plane.XY):
        with Locations((30.25, 29.3)):
            Rectangle(SKETCH_3_12_W, SKETCH_3_12_H)
    extrude(amount=-EXTRUDE_8_3_DEPTH)


with BuildPart() as body_7:
    # 草图3<12> → Extrude 8 4 (new body)
    with BuildSketch(Plane.XY):
        with Locations((30.25, -29.3)):
            Rectangle(SKETCH_3_12_W, SKETCH_3_12_H)
    extrude(amount=-EXTRUDE_8_4_DEPTH)


with BuildPart() as body_8:
    # 草图3<12> → Extrude 8 5 (new body)
    with BuildSketch(Plane.XY):
        with Locations((-30.25, -29.3)):
            Rectangle(SKETCH_3_12_W, SKETCH_3_12_H)
    extrude(amount=-EXTRUDE_8_5_DEPTH)


with BuildPart() as body_9:
    # 草图3<12> → Extrude 8 6 (new body)
    with BuildSketch(Plane.XY):
        with BuildLine():
            Line((-16, -48.425200051), (-17.098039216, -51.748498094))
            ThreePointArc((-17.098039216, -51.748498094), (0, -54.5), (17.098039216, -51.748498094))
            Line((17.098039216, -51.748498094), (16, -48.425200051))
            ThreePointArc((16, -48.425200051), (0, -51), (-16, -48.425200051))
        make_face()
    extrude(amount=-EXTRUDE_8_6_DEPTH)


solid = Compound([part.part, body_2_1.part, body_3_1.part, body_4.part, body_5.part, body_6.part, body_7.part, body_8.part, body_9.part])
